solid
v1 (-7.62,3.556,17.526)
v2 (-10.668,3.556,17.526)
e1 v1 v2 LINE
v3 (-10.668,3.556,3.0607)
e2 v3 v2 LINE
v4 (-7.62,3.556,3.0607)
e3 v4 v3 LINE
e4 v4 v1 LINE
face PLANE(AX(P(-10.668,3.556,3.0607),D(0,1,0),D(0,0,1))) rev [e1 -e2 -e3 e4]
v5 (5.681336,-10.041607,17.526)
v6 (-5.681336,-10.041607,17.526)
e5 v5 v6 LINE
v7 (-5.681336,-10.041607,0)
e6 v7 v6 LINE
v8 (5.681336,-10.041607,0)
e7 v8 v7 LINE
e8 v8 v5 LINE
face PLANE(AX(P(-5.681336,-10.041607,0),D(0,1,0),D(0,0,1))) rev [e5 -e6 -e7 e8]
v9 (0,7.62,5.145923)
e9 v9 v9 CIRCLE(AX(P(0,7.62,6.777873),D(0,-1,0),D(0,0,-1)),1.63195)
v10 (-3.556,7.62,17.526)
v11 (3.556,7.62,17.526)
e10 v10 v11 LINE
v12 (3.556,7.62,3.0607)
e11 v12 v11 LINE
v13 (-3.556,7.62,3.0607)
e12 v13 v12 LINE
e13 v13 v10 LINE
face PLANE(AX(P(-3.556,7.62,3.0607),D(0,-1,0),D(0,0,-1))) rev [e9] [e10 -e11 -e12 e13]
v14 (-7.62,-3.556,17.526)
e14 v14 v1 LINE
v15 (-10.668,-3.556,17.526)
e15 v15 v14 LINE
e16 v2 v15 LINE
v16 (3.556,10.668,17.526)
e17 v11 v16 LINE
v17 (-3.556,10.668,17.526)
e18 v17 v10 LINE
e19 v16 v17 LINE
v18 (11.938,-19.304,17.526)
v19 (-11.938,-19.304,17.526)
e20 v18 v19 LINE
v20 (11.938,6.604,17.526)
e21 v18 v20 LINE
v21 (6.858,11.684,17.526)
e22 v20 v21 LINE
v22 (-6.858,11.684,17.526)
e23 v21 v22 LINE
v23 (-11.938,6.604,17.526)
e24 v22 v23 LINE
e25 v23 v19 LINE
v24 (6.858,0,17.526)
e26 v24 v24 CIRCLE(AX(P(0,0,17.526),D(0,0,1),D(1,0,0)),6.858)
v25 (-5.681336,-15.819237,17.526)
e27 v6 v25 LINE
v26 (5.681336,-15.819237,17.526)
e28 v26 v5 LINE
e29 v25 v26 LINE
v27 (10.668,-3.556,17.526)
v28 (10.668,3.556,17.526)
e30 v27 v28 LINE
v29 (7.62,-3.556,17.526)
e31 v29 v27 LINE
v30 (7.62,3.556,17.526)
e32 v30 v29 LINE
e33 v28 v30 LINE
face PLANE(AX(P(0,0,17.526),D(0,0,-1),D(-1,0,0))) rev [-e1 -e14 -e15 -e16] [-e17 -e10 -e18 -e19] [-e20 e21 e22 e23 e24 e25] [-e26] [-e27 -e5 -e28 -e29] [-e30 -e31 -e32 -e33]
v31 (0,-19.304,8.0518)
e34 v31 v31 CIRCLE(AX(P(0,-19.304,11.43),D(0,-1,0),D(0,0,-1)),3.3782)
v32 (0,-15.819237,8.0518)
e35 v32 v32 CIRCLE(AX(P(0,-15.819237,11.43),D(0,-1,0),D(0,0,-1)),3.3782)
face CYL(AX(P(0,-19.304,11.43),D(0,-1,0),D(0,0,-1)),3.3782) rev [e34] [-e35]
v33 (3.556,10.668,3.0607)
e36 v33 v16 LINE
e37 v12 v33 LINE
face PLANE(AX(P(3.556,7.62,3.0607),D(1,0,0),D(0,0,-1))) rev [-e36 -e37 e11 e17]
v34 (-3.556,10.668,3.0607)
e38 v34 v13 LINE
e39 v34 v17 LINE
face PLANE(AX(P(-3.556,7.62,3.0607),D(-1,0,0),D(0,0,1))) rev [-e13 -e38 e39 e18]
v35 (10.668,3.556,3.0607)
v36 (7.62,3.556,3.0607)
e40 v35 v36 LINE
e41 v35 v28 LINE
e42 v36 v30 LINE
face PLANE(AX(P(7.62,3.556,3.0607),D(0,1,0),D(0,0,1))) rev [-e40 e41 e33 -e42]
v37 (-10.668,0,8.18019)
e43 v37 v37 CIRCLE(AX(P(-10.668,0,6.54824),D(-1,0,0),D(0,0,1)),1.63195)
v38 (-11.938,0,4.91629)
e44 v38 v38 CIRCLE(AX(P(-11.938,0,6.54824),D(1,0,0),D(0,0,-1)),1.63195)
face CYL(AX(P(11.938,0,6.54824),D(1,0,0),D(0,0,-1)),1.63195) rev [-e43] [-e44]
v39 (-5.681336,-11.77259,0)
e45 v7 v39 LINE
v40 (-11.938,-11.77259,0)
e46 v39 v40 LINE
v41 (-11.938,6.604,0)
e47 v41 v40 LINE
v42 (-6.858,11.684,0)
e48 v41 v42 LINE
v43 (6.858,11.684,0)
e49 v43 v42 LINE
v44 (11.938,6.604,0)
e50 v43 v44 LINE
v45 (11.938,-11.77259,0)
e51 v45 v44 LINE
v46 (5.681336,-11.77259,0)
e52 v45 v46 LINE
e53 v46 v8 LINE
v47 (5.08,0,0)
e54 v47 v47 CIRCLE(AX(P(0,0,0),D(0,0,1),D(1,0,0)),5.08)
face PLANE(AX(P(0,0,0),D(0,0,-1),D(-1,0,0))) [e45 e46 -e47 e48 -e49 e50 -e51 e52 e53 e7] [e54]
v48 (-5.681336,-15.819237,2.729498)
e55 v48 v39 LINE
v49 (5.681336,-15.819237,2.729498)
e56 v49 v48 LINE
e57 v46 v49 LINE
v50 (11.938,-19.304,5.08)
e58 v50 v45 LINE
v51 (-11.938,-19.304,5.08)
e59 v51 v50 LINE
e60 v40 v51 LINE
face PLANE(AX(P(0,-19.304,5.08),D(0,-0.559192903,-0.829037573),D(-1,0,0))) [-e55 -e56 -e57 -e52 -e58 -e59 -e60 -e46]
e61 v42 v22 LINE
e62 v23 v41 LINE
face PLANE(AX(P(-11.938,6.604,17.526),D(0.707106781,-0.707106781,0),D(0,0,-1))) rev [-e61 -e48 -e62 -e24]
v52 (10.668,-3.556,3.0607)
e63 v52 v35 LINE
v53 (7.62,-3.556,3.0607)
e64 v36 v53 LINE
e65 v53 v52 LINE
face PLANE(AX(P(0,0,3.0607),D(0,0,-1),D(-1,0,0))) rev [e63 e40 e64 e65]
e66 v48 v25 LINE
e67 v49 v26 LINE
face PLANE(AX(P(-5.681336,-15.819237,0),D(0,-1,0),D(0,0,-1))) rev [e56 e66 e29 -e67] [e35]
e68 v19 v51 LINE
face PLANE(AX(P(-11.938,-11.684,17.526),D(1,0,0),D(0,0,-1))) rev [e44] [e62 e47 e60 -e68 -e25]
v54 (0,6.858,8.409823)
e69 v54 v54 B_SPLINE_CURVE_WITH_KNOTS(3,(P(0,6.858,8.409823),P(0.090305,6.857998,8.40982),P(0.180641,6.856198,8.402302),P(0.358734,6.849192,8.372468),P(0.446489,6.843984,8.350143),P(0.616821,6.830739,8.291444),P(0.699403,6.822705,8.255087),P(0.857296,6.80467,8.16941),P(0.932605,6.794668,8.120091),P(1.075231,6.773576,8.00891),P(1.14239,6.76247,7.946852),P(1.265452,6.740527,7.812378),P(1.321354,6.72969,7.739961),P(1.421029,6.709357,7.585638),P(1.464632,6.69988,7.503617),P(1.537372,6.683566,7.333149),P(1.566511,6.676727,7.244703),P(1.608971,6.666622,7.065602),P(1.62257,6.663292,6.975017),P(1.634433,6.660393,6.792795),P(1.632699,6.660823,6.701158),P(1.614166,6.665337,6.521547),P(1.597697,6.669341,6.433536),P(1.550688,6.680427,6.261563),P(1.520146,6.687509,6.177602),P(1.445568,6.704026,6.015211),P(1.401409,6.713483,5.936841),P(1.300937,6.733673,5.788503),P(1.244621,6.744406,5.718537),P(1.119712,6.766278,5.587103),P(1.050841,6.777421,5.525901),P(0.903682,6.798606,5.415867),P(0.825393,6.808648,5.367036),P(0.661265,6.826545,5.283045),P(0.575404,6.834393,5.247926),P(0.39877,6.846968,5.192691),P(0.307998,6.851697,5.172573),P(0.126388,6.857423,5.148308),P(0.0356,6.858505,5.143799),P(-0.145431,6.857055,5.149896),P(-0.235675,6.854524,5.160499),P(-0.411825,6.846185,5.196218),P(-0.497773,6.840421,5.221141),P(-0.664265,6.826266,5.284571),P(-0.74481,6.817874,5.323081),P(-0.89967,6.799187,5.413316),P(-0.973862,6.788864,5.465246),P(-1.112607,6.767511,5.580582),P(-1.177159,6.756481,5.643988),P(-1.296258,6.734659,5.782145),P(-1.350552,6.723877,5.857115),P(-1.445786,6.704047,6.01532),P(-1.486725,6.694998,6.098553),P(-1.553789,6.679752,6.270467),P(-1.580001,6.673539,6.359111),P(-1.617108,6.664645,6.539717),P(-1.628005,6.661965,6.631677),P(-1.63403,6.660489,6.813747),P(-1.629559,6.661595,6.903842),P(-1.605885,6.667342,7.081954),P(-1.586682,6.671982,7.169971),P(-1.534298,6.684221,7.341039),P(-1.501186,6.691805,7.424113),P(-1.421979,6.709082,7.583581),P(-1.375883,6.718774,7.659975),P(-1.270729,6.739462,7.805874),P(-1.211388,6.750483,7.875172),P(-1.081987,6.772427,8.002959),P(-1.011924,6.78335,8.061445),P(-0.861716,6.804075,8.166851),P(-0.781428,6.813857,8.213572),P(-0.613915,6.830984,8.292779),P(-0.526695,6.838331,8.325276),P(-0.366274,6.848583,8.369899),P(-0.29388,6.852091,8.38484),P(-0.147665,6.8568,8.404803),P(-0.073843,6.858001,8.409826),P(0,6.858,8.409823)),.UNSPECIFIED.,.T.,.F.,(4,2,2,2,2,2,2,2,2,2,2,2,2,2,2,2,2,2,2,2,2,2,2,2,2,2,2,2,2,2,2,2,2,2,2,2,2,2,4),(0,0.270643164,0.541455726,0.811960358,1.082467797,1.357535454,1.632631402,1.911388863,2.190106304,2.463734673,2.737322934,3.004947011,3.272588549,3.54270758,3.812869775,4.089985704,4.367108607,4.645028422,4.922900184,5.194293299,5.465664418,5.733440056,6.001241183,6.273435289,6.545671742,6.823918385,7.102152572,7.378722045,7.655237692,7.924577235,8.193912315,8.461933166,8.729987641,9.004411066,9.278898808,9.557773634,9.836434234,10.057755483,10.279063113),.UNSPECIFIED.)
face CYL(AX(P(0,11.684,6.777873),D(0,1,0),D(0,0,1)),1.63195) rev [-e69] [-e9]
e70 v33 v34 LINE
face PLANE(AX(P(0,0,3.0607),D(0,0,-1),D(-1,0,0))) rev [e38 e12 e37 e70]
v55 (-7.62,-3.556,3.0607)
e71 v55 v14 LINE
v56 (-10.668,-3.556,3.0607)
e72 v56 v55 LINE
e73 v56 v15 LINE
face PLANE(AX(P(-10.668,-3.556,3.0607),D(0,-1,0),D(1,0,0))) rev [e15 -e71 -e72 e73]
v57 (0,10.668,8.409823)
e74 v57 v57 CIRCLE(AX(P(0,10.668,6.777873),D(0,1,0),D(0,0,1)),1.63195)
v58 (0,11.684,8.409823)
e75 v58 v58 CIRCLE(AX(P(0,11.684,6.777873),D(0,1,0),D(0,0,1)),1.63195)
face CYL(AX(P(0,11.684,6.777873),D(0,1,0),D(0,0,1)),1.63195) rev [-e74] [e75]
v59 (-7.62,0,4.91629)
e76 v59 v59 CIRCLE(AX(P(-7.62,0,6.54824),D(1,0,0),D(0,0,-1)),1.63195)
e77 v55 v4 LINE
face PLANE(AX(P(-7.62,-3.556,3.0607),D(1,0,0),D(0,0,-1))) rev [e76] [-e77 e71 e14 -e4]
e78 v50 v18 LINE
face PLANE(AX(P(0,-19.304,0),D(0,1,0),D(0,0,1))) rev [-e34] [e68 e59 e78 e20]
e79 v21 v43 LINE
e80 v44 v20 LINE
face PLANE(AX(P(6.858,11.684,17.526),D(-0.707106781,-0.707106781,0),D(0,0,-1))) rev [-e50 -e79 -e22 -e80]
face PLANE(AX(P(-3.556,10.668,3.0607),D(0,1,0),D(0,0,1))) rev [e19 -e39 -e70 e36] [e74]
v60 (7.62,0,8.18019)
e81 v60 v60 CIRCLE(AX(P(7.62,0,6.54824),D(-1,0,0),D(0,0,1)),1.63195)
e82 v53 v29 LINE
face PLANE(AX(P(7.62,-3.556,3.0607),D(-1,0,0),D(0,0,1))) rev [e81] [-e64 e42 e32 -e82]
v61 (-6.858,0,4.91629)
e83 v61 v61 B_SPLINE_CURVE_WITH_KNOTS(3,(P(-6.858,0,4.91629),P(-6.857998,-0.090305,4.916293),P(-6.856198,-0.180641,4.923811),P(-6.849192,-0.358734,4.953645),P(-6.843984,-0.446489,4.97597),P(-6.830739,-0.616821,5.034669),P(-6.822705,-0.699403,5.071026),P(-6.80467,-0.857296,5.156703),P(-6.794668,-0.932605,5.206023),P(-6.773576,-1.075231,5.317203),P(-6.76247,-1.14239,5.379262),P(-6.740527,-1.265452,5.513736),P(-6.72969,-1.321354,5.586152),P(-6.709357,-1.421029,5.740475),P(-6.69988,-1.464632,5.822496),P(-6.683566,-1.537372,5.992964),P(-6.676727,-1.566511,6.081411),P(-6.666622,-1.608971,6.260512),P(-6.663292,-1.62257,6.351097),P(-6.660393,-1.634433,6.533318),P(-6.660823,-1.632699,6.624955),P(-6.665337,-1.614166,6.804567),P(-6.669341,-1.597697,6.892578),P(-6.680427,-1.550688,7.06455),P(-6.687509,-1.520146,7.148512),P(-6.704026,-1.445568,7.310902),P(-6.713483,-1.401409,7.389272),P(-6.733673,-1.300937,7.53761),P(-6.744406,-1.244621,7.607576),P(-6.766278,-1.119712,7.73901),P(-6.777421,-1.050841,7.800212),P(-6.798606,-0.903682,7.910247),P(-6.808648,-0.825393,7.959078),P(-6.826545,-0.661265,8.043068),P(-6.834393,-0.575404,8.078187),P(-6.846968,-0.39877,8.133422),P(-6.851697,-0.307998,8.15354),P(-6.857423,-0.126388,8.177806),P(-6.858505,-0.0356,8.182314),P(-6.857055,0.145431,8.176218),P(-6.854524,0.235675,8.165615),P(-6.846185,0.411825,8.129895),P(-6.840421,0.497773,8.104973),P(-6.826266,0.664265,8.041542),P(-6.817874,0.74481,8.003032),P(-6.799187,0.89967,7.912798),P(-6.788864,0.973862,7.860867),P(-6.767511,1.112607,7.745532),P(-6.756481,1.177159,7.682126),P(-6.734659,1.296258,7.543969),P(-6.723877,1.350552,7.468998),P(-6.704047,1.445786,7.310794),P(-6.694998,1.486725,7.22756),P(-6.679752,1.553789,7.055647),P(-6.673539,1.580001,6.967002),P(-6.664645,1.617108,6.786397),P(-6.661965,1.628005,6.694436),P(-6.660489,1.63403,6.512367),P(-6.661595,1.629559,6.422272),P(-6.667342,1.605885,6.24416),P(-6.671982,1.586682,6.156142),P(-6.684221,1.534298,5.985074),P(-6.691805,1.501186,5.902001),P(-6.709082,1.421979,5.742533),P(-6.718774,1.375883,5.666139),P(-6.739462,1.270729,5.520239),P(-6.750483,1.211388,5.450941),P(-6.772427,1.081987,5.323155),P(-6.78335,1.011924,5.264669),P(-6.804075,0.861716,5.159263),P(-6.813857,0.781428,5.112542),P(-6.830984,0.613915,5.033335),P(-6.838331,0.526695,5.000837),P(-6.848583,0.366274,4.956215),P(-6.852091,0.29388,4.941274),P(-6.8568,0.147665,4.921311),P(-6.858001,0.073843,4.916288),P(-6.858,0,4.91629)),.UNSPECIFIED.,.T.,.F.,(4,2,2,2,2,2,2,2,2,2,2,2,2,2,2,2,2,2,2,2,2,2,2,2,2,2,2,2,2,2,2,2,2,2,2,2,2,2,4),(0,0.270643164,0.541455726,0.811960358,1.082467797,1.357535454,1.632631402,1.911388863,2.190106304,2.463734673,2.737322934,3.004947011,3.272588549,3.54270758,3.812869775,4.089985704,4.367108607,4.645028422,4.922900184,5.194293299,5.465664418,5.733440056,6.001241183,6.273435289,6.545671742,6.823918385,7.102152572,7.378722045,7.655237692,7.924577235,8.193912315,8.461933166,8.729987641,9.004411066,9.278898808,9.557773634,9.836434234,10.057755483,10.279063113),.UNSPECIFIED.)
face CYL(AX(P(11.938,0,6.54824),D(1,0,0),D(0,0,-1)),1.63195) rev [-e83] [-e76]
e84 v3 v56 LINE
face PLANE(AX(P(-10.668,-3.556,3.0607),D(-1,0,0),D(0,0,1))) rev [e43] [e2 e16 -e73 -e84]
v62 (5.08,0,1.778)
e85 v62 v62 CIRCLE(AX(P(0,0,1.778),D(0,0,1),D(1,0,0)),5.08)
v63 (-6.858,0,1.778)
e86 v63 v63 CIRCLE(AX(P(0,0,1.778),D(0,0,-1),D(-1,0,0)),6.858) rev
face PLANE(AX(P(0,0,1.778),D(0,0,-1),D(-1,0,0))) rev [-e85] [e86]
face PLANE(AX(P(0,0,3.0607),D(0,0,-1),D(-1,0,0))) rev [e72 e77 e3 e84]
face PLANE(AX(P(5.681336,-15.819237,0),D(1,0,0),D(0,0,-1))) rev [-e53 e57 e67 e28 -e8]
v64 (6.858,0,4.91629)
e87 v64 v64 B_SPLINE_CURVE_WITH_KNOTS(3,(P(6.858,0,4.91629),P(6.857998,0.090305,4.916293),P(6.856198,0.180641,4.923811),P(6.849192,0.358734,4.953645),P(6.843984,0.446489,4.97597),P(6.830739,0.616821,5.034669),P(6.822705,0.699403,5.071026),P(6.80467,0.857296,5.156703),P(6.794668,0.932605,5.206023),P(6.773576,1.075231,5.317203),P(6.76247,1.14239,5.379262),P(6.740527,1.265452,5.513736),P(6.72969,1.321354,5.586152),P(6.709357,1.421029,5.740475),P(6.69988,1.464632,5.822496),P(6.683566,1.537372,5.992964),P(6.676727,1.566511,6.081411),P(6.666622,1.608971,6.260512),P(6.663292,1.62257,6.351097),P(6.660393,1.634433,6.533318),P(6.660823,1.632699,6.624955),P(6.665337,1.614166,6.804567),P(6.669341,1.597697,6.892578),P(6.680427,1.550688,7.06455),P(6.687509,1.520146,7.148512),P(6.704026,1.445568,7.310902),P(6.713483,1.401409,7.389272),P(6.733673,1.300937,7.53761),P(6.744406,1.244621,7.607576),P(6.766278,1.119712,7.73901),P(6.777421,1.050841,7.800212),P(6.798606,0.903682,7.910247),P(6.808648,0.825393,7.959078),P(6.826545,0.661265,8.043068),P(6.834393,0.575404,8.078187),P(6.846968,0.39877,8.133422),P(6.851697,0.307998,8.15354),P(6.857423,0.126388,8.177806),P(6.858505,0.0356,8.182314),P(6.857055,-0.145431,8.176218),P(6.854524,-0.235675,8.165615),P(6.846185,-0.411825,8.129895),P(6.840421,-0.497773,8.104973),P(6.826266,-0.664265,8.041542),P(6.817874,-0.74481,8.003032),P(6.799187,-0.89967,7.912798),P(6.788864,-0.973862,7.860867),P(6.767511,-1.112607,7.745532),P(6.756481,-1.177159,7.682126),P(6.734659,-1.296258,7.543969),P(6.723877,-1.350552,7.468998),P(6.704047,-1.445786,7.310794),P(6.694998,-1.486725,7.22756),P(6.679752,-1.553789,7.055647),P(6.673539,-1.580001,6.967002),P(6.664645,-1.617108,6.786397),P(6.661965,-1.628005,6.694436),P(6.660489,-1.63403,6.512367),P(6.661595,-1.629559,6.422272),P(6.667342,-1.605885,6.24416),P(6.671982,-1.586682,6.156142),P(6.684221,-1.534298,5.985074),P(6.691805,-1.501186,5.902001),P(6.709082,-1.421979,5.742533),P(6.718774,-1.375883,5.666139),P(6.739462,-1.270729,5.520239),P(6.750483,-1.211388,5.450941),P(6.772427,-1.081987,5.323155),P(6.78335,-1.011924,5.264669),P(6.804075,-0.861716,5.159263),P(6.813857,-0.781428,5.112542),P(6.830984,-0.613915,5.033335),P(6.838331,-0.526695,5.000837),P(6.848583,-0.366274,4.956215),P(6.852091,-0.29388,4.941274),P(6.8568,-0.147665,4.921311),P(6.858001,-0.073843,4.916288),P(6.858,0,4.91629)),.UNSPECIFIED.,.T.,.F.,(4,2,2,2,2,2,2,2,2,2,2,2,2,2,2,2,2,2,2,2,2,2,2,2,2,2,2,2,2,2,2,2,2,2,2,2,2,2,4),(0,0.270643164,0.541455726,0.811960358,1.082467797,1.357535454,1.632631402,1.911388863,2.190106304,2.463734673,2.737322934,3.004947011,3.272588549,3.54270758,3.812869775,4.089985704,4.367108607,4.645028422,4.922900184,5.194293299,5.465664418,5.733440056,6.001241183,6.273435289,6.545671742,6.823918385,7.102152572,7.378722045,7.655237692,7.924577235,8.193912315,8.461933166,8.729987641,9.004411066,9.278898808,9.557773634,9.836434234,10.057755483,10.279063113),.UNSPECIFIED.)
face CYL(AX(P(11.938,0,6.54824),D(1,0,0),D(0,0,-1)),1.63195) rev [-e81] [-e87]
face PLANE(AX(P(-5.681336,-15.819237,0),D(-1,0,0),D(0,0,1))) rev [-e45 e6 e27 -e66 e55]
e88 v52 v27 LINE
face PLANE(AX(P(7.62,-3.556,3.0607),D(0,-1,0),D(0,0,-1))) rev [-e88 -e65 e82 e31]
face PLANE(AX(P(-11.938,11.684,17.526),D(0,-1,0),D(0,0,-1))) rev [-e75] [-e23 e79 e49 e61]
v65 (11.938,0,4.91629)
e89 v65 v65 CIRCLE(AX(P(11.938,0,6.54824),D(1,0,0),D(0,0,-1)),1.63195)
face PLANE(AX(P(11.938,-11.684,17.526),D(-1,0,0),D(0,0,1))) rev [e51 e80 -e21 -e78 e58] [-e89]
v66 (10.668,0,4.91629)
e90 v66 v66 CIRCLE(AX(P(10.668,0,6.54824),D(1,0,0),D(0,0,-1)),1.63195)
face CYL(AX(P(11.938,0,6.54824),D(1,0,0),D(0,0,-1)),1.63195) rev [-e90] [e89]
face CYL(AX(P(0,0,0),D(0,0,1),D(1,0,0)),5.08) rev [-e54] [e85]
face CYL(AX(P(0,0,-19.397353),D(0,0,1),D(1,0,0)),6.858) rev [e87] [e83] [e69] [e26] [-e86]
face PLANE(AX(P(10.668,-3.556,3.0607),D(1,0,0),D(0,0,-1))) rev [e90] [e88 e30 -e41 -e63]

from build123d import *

# Parameters (mm, degrees)
SKETCH1_W                   = 23.876
SKETCH1_H                   = 23.368
BOSS_EXTRUDE1_DEPTH         = 17.526
SKETCH2_R                   = 6.858
CUT_EXTRUDE2_DEPTH          = 15.748
SKETCH3_R                   = 5.08
CUT_EXTRUDE3_DEPTH          = 1.778
SKETCH4_W                   = 23.876
SKETCH4_H                   = 17.526
BOSS_EXTRUDE2_DEPTH         = 7.62
SKETCH6_W                   = 11.362672476
SKETCH6_H                   = 5.777630073
CUT_EXTRUDE5_DEPTH          = 29.676138792
CHAMFER1_SIZE               = 5.08
CHAMFER1_SIZE_2             = 7.53140972
F_1_4_CLEARANCE_HOLE1_D     = 6.7564
F_1_4_CLEARANCE_HOLE1_DEPTH = 3.484763225
SKETCH10_W                  = 7.112
SKETCH10_H                  = 3.048
SKETCH10_W_2                = 3.048
SKETCH10_H_2                = 7.112
CUT_EXTRUDE6_DEPTH          = 14.4653
F_4_CLEARANCE_HOLE1_D       = 3.2639
F_4_CLEARANCE_HOLE1_DEPTH   = 6.604
F_4_CLEARANCE_HOLE1_TIP     = 0.980574487
F_4_CLEARANCE_HOLE2_D       = 3.2639
CHAMFER2_SIZE               = 5.08


with BuildPart() as part:
    # Sketch1 → Boss-Extrude1 (new body)
    with BuildSketch(Plane.XY):
        Rectangle(SKETCH1_W, SKETCH1_H)
    extrude(amount=BOSS_EXTRUDE1_DEPTH)

    # Sketch2 → Cut-Extrude2 (cut)
    with BuildSketch(Plane.XY.offset(17.526)):
        Circle(SKETCH2_R)
    extrude(amount=-CUT_EXTRUDE2_DEPTH, mode=Mode.SUBTRACT)

    # Sketch3 → Cut-Extrude3 (cut)
    with BuildSketch(Plane.XY.offset(1.778)):
        Circle(SKETCH3_R)
    extrude(amount=-CUT_EXTRUDE3_DEPTH, mode=Mode.SUBTRACT)

    # Sketch4 → Boss-Extrude2 (add)
    with BuildSketch(Plane.XZ.offset(11.684)):
        with Locations((0, 8.763)):
            Rectangle(SKETCH4_W, SKETCH4_H)
    extrude(amount=BOSS_EXTRUDE2_DEPTH)

    # Sketch6 → Cut-Extrude5 (cut, through all)
    with BuildSketch(Plane.XY.offset(17.526)):
        with Locations((0, -12.930421739)):
            Rectangle(SKETCH6_W, SKETCH6_H)
    extrude(amount=-CUT_EXTRUDE5_DEPTH, mode=Mode.SUBTRACT)

    # Chamfer1
    # the kernel refuses this chamfer: 7.53140972, 5.08 mm, written as the material it takes off along each edge
    with BuildSketch(Plane(origin=(-31.395464843, -19.304, 0), x_dir=(0, -0.04753214298802828, 0.9988697089125115), z_dir=(1, 0, 0))) as chamfer1_piece_1:
        Polygon((CHAMFER1_SIZE * 0.998869708913, -CHAMFER1_SIZE * 0.047532142988), (-CHAMFER1_SIZE_2 * 0.0475321429883, -CHAMFER1_SIZE_2 * 0.998869708918), (0, 0), align=None)
    extrude(amount=62.790929686, mode=Mode.SUBTRACT)

    # 1/4 Clearance Hole1
    with Locations(Plane(origin=(0, -19.304, 0), x_dir=(-1, 0, 0), z_dir=(0, -1, 0))):
        with Locations((0, -11.43)):
            Hole(F_1_4_CLEARANCE_HOLE1_D / 2, depth=F_1_4_CLEARANCE_HOLE1_DEPTH)

    # Sketch10 → Cut-Extrude6 (cut)
    with BuildSketch(Plane.XY.offset(17.526)):
        with Locations((0, 9.144)):
            Rectangle(SKETCH10_W, SKETCH10_H)
        with Locations((9.144, 0)):
            Rectangle(SKETCH10_W_2, SKETCH10_H_2)
        with Locations((-9.144, 0)):
            Rectangle(SKETCH10_W_2, SKETCH10_H_2)
    extrude(amount=-CUT_EXTRUDE6_DEPTH, mode=Mode.SUBTRACT)

    # #4 Clearance Hole1
    with Locations(Plane(origin=(0, 11.684, 0), x_dir=(1, 0, 0), z_dir=(0, 1, 0))):
        with Locations((0, -6.777873248)):
            Hole(F_4_CLEARANCE_HOLE1_D / 2, depth=F_4_CLEARANCE_HOLE1_DEPTH)
            with Locations((0, 0, -(F_4_CLEARANCE_HOLE1_DEPTH + F_4_CLEARANCE_HOLE1_TIP / 2))):  # 118° drill point
                Cone(0, F_4_CLEARANCE_HOLE1_D / 2, F_4_CLEARANCE_HOLE1_TIP, mode=Mode.SUBTRACT)

    # #4 Clearance Hole2 (through all)
    with Locations(Plane(origin=(11.938, 0, 0), x_dir=(0, 0, -1), z_dir=(1, 0, 0))):
        with Locations((-6.548240248, 0)):
            f_4_clearance_hole2 = Hole(F_4_CLEARANCE_HOLE2_D / 2)

    # Mirror1: #4 Clearance Hole2 across plane
    add(f_4_clearance_hole2.mirror(Plane(origin=(0, 0, 0), x_dir=(0, 0, 1), z_dir=(1, 0, 0))), mode=Mode.SUBTRACT)

    # Chamfer2
    chamfer2_edges = [part.edges().sort_by_distance(p)[0] for p in [
        (-11.938, 11.684, 8.763),
        (11.938, 11.684, 8.763),
    ]]
    chamfer(chamfer2_edges, length=CHAMFER2_SIZE)


solid = part.part
